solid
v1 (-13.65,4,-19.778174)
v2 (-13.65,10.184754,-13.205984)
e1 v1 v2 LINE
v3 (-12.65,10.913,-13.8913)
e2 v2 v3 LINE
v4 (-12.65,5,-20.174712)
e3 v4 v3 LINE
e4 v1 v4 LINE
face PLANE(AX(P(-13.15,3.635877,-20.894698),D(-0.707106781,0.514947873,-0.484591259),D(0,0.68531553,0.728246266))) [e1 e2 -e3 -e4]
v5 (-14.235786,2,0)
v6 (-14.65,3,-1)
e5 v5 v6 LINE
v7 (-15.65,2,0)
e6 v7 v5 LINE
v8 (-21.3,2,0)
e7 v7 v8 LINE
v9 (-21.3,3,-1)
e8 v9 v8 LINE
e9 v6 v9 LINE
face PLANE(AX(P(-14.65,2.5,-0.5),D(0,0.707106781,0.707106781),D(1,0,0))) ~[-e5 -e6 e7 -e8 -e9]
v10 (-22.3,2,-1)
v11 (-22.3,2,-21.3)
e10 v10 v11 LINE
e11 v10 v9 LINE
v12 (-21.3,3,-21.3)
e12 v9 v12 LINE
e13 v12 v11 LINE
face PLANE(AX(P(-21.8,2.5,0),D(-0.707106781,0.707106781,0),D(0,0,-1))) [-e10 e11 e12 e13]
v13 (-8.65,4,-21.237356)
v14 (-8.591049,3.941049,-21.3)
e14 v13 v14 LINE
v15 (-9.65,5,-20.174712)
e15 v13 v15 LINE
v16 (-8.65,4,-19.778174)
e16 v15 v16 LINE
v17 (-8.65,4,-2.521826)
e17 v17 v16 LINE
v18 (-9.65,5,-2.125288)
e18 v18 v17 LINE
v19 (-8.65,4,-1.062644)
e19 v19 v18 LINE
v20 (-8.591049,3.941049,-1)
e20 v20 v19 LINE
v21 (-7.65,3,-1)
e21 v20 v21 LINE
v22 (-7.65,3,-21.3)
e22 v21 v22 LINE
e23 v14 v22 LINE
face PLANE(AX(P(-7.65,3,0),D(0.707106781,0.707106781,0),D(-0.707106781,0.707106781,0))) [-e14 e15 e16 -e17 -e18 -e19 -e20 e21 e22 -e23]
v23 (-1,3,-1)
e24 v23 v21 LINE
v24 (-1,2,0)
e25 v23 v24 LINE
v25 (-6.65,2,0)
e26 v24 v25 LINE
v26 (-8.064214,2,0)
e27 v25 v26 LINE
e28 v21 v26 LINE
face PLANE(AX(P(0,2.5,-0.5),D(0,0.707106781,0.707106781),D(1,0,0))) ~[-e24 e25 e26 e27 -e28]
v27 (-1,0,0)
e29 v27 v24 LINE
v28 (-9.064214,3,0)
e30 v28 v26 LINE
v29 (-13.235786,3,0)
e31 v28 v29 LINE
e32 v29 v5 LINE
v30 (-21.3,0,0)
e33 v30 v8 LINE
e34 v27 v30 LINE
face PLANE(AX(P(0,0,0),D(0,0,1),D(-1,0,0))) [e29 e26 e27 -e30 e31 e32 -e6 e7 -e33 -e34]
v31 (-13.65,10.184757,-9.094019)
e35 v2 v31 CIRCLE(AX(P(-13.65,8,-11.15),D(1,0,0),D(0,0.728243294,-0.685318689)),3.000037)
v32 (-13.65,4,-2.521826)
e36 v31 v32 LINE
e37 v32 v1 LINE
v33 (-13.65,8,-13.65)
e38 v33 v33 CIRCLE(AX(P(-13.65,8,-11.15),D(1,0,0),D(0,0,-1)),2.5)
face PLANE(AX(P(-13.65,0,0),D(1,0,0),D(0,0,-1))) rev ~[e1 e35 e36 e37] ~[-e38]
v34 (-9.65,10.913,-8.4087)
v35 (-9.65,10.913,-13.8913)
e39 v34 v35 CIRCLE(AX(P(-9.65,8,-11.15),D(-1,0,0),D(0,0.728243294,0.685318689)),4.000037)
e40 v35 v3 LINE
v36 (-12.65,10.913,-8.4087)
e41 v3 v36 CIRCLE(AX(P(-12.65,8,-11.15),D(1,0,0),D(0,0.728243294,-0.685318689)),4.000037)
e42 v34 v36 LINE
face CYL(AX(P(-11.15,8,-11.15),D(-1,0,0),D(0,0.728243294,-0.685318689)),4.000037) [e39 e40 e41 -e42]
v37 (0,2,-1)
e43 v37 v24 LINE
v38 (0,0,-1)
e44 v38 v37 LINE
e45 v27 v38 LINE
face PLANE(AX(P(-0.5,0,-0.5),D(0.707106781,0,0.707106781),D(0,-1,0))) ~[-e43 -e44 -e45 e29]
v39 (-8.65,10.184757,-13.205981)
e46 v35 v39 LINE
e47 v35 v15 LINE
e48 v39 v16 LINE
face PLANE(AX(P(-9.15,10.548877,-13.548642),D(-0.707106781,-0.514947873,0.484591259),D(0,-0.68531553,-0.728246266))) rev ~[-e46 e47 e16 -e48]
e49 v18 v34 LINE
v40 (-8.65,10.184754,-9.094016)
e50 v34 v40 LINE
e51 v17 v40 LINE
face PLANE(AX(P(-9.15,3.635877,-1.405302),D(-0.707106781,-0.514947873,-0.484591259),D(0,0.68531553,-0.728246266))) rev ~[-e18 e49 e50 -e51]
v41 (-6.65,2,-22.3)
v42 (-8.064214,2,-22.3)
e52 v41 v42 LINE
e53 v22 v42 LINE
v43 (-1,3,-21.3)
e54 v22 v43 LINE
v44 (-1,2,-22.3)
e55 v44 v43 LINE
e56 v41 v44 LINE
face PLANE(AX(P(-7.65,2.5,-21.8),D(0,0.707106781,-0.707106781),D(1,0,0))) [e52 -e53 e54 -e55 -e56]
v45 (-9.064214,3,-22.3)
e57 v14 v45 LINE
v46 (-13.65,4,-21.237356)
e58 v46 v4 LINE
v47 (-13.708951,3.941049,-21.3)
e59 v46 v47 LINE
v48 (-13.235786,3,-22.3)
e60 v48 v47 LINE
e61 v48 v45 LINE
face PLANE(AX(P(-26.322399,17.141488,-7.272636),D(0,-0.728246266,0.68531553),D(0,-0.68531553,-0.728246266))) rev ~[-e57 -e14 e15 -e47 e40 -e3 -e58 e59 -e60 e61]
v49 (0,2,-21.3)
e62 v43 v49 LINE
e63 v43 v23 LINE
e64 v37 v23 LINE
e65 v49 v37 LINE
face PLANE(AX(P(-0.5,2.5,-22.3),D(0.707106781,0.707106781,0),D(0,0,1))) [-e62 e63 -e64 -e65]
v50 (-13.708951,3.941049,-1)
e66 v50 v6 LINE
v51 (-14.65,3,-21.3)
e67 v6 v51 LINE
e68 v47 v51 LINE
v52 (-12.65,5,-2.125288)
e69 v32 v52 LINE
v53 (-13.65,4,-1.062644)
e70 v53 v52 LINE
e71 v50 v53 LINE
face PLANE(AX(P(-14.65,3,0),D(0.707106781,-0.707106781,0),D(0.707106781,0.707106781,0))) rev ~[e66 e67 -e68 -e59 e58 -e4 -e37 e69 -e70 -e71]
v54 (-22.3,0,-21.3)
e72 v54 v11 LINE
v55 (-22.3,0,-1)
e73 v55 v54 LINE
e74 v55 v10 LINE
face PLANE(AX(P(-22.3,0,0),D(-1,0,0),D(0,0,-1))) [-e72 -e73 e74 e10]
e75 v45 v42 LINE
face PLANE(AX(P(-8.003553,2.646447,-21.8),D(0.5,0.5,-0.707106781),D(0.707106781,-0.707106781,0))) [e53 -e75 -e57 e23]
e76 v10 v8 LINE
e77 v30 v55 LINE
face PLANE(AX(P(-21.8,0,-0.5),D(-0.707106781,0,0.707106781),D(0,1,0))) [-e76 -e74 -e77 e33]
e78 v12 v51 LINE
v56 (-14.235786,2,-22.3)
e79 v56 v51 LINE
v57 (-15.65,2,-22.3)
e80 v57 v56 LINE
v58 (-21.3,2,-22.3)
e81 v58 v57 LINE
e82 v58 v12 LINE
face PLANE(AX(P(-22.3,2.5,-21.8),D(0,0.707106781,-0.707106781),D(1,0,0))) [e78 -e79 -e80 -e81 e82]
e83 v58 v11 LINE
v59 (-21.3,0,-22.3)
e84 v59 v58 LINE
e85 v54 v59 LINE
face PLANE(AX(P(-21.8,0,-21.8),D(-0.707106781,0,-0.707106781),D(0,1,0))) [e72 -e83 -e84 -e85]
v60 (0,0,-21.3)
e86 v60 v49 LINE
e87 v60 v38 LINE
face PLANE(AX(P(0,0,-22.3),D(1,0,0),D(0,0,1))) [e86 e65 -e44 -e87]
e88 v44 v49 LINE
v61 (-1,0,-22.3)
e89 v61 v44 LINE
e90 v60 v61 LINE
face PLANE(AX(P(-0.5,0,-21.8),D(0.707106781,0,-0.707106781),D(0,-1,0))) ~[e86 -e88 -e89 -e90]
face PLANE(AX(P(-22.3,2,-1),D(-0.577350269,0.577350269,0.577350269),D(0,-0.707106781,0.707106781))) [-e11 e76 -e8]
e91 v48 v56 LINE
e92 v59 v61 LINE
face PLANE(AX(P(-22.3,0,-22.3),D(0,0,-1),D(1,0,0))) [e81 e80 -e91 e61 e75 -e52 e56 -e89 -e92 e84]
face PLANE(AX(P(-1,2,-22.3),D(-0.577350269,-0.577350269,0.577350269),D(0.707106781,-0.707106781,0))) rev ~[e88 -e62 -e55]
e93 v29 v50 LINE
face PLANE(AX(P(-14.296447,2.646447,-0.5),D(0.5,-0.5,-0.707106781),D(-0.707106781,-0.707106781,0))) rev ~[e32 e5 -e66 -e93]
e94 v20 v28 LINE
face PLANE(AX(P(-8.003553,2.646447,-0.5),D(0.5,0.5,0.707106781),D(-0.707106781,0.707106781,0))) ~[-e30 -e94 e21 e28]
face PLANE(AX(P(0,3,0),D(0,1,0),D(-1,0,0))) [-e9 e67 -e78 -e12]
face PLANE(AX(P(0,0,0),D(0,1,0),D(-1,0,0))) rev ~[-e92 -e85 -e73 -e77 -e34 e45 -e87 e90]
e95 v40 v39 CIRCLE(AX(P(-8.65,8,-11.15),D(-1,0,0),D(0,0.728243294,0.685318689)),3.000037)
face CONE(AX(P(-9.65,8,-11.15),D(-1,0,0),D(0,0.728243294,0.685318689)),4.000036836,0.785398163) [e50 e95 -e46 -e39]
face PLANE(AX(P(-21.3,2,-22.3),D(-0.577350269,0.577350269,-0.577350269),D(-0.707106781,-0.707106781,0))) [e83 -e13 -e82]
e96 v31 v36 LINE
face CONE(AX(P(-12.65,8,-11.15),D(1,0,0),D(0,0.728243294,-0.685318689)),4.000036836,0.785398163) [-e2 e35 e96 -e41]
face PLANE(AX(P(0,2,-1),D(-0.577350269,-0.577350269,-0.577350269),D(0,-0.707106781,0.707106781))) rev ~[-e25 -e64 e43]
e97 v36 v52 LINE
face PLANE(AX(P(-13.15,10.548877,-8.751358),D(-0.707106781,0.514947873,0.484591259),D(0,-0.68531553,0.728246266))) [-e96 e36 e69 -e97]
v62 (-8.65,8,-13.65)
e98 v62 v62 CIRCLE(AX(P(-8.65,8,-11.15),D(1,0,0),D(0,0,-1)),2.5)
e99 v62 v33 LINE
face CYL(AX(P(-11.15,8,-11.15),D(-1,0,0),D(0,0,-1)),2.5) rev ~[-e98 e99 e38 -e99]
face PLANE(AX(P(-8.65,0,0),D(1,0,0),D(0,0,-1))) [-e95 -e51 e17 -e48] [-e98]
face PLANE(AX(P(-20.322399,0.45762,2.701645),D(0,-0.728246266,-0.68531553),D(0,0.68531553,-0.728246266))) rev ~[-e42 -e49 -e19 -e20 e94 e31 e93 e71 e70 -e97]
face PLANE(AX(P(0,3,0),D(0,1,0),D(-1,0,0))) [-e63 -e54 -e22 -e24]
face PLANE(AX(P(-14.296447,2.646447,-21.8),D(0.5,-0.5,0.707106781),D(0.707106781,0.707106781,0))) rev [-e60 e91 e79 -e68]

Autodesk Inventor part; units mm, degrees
ref_plane "YZ Plane" through (0, 0, 0) normal (1, 0, 0) x (0, 1, 0)
ref_plane "XZ Plane" through (0, 0, 0) normal (0, 1, 0) x (-1, 0, 0)
ref_plane "XY Plane" through (0, 0, 0) normal (0, 0, 1) x (1, 0, 0)
sketch "Sketch1" plane through (0, 0, 0) normal (0, 1, 0) x (-1, 0, 0)
  line L0 (0, 0) -> (22.3, 0)
  line L1 (22.3, 0) -> (22.3, -22.3)
  line L2 (22.3, -22.3) -> (0, -22.3)
  line L3 (0, -22.3) -> (0, 0)
  dimension "d0" = 22.3
  dimension "d1" = 22.3
extrude "Extrusion1" add sketch "Sketch1" along normal blind 3
ref_plane "Work Plane1" through (-11.15, 0, 0) normal (1, 0, 0) x (0, 0, -1)
sketch "Sketch3" plane through (-11.15, 0, 0) normal (1, 0, 0) x (0, 0, -1)
  line L0 (0, 3) -> (22.3, 3) projected
  circle A0 centre (11.15, 8) radius 2.5
  arc A1 (13.8913, 10.913) -> (8.4087, 10.913) centre (11.15, 8) ccw
  line L1 (0, 0) -> (0, 3) projected
  line L2 (0, 3) -> (8.4087, 10.913)
  line L3 (13.8913, 10.913) -> (22.3, 3)
  dimension "d5" = 5
  dimension "d6" = 8
  dimension "d7" = 11.15
  dimension "d8" = 5
extrude "Extrusion2" add sketch "Sketch3" along normal mid plane 5
chamfer "Chamfer1" distance 1 angle 45 1 edges at (-8.65, 3, -11.15)
chamfer "Chamfer2" distance 1 angle 45 1 edges at (-13.65, 3, -11.15)
chamfer "Chamfer3" distance 1 angle 45 3 edges at (-13.65, 12, -11.15) (-13.65, 7.4565, -17.5643) (-13.65, 7.4565, -4.7357)
chamfer "Chamfer4" distance 1 angle 45 3 edges at (-8.65, 7.4565, -4.7357) (-8.65, 12, -11.15) (-8.65, 7.4565, -17.5643)
chamfer "Chamfer5" distance 1 angle 45 10 edges at (-18.475, 3, 0) (-22.3, 3, -11.15) (-3.825, 3, 0) (0, 3, -11.15) (-3.825, 3, -22.3) (-18.475, 3, -22.3) (0, 1.5, -22.3) (0, 1.5, 0) (-22.3, 1.5, -22.3) (-22.3, 1.5, 0)
chamfer "Chamfer6" distance 1 angle 45 2 edges at (-7.15, 2.5, 0) (-15.15, 2.5, 0)
chamfer "Chamfer7" distance 1 angle 45 2 edges at (-7.15, 2.5, -22.3) (-15.15, 2.5, -22.3)
equation "\"d1\" = d0"
equation "\"d7\" = 0.5 * d0"
equation "\"d4\" = -0.5 * d0"
properties part number "TrackPivotConnector"
